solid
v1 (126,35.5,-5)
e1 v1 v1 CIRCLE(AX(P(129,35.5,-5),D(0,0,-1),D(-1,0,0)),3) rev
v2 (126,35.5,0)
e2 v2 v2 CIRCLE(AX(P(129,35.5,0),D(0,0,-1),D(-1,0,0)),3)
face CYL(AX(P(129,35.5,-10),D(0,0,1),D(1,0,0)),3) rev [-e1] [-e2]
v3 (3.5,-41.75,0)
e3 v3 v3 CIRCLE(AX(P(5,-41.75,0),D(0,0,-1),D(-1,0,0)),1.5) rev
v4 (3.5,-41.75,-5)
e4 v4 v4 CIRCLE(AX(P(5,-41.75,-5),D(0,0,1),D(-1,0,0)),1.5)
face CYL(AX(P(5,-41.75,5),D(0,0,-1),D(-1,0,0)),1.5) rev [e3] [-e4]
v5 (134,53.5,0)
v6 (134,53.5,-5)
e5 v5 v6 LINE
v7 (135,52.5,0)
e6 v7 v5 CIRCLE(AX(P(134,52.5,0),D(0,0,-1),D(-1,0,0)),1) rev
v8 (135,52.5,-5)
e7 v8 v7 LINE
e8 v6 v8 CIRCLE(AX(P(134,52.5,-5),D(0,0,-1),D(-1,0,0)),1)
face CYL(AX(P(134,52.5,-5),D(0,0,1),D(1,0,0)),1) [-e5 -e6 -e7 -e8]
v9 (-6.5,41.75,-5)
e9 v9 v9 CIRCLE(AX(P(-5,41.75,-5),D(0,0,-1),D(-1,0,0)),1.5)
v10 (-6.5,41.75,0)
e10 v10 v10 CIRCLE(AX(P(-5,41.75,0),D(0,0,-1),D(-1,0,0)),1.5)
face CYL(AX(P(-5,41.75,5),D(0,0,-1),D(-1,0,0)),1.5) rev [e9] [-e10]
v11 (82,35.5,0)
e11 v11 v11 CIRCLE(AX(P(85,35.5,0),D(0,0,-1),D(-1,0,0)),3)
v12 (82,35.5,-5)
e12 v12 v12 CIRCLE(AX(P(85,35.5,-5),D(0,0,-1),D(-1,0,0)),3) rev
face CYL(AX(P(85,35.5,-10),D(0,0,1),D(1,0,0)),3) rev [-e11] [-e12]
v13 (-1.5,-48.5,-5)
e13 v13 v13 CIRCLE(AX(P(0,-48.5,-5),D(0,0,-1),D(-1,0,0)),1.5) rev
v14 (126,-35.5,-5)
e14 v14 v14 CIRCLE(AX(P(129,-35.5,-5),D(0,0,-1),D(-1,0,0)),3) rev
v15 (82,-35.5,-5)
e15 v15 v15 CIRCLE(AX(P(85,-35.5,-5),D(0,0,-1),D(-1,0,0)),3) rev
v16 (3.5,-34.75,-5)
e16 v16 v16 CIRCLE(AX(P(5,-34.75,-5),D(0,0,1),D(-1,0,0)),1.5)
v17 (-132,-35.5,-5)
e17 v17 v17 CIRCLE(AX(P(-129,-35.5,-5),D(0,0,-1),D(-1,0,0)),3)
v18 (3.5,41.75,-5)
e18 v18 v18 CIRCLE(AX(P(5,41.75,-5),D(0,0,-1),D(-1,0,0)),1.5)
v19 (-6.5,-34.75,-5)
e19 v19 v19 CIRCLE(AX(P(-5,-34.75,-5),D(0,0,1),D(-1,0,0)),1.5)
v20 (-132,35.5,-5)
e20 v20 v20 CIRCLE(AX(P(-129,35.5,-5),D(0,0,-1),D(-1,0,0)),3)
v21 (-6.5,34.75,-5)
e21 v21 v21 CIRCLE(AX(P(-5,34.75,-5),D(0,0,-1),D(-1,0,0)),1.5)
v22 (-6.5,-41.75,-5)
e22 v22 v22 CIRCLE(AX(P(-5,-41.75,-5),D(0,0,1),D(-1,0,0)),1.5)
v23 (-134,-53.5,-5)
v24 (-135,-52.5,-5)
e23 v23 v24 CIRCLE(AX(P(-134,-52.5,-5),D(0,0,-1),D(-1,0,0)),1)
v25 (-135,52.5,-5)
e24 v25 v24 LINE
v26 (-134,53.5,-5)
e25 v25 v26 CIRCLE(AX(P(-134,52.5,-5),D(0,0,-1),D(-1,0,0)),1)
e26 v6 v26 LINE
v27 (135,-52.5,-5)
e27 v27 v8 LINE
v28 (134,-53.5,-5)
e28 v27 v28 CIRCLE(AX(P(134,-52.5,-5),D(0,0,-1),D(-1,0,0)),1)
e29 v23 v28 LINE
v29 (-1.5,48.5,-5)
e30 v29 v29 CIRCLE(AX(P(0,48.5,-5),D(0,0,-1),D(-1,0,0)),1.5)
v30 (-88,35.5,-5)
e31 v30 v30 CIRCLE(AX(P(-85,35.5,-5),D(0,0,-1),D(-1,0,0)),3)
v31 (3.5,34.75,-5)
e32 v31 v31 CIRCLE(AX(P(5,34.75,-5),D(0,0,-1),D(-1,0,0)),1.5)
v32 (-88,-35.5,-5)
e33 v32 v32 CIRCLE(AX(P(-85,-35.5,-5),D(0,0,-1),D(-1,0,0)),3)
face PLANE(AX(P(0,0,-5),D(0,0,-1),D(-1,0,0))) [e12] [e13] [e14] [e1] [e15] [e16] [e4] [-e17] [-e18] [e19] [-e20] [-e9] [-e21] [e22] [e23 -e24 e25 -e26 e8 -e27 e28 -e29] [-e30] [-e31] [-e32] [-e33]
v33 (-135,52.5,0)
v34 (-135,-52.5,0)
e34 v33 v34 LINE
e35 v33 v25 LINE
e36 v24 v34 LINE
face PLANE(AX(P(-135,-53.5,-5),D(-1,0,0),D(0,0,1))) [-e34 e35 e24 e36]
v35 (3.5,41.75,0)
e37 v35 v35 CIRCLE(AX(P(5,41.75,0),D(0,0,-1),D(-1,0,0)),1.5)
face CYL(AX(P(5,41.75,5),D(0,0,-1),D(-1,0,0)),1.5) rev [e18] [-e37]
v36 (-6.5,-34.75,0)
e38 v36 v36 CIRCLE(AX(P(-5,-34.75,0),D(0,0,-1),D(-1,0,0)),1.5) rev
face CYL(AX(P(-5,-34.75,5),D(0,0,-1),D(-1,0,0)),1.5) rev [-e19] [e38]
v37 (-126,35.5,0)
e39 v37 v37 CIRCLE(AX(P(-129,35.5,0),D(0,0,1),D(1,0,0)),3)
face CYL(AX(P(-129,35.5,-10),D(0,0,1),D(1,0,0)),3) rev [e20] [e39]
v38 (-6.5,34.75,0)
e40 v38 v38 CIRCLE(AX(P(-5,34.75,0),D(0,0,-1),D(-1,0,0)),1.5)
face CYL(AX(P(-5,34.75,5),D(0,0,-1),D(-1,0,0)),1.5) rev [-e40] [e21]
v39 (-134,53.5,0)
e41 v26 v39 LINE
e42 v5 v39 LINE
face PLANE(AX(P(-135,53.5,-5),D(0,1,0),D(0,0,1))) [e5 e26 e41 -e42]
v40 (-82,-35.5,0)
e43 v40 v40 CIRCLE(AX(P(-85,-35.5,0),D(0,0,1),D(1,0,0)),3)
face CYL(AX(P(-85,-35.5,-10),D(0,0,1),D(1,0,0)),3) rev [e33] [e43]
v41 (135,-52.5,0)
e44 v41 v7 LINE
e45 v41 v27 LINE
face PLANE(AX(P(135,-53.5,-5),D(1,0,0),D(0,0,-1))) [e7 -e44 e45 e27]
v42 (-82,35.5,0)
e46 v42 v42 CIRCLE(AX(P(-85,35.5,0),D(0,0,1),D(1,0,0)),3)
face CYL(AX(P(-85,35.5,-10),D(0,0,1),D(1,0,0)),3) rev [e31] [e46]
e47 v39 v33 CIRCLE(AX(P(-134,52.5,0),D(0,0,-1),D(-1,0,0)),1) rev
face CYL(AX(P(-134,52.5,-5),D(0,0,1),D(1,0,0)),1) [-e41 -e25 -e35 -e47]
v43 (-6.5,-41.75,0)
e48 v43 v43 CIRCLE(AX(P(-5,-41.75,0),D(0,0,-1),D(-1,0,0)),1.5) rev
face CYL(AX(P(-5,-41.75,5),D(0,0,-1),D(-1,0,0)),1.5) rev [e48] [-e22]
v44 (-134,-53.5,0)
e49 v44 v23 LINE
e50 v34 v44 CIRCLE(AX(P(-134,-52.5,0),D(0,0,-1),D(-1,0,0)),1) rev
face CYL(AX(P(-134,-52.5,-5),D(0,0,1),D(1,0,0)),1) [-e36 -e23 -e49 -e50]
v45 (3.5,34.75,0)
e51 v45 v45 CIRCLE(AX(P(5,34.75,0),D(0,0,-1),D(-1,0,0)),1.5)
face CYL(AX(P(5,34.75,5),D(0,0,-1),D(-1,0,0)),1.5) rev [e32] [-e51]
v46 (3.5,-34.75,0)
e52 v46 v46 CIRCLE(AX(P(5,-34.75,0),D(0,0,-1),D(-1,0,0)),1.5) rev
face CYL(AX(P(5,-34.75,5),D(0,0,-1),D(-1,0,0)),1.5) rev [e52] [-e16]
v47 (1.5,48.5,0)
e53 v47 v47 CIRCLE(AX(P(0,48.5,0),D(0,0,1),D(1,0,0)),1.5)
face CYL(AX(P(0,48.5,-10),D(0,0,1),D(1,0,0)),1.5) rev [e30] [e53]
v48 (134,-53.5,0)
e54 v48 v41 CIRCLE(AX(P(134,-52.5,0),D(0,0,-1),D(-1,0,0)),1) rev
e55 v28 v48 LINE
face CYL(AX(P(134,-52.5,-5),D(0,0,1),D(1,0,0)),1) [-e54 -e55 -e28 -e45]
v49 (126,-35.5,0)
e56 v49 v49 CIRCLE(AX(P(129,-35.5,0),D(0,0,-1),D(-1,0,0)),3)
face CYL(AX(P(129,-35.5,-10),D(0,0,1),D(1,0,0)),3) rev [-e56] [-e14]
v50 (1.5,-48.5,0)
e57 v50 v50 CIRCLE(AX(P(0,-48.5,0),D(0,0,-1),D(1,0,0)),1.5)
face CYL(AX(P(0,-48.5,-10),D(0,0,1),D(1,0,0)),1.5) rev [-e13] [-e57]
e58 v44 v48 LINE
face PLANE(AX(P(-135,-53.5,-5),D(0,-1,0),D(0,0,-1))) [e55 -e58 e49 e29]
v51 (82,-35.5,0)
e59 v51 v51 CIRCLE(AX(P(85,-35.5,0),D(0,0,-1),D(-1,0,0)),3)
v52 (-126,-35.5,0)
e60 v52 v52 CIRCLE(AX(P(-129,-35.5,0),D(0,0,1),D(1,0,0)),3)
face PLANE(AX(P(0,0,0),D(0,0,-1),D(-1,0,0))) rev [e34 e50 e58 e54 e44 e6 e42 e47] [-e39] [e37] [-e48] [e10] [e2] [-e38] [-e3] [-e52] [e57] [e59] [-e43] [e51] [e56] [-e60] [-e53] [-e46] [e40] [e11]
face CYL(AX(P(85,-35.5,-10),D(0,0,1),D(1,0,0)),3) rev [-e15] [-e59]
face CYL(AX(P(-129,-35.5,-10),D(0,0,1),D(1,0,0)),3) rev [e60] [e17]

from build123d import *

# Parameters (mm, degrees)
SKETCH_1_W             = 270
SKETCH_1_H             = 107
SM_BASE_FLANGE_1_DEPTH = 5
SKETCH_6_R             = 3
CUT_EXTRUDE_1_DEPTH    = 10
SKETCH_7_R             = 1.5
CUT_EXTRUDE_2_DEPTH    = 10
FILLET_1_R             = 1
SKETCH_8_R             = 1.5
CUT_EXTRUDE_3_DEPTH    = 10


# Sheet-metal steps are written as plain solids
with BuildPart() as part:
    # Sketch 1 → 基体-法兰1 (new body)
    with BuildSketch(Plane.XY):
        Rectangle(SKETCH_1_W, SKETCH_1_H)
    extrude(amount=-SM_BASE_FLANGE_1_DEPTH)

    # 草图6 → 切除-拉伸1 (cut)
    with BuildSketch(Plane.XY):
        with Locations((-129, 35.5)):
            Circle(SKETCH_6_R)
        with Locations((-129, -35.5)):
            Circle(SKETCH_6_R)
        with Locations((-85, 35.5)):
            Circle(SKETCH_6_R)
        with Locations((-85, -35.5)):
            Circle(SKETCH_6_R)
    cut_extrude_1 = extrude(amount=-CUT_EXTRUDE_1_DEPTH, mode=Mode.SUBTRACT)

    # 镜向1: 切除-拉伸1 across plane
    add(cut_extrude_1.mirror(Plane(origin=(0, 0, 0), x_dir=(0, 0, 1), z_dir=(1, 0, 0))), mode=Mode.SUBTRACT)

    # 草图7 → 切除-拉伸2 (cut)
    with BuildSketch(Plane.XY):
        with Locations((0, 48.5)):
            Circle(SKETCH_7_R)
    cut_extrude_2 = extrude(amount=-CUT_EXTRUDE_2_DEPTH, mode=Mode.SUBTRACT)

    # 镜向2: 切除-拉伸2 across plane
    add(cut_extrude_2.mirror(Plane.ZX), mode=Mode.SUBTRACT)

    # 圆角1
    fillet_1_edges = [part.edges().sort_by_distance(p)[0] for p in [
        (135, -53.5, -2.5),
        (-135, -53.5, -2.5),
        (-135, 53.5, -2.5),
        (135, 53.5, -2.5),
    ]]
    fillet(fillet_1_edges, radius=FILLET_1_R)

    # 草图8 → 切除-拉伸3 (cut)
    with BuildSketch(Plane(origin=(0, 0, -5), x_dir=(-1, 0, 0), z_dir=(0, 0, -1))):
        with Locations((-5, 41.75)):
            Circle(SKETCH_8_R)
        with Locations((5, 41.75)):
            Circle(SKETCH_8_R)
        with Locations((5, 34.75)):
            Circle(SKETCH_8_R)
        with Locations((-5, 34.75)):
            Circle(SKETCH_8_R)
    cut_extrude_3 = extrude(amount=-CUT_EXTRUDE_3_DEPTH, mode=Mode.SUBTRACT)

    # 镜向3: 切除-拉伸3 across plane
    add(cut_extrude_3.mirror(Plane.ZX), mode=Mode.SUBTRACT)


solid = part.part
